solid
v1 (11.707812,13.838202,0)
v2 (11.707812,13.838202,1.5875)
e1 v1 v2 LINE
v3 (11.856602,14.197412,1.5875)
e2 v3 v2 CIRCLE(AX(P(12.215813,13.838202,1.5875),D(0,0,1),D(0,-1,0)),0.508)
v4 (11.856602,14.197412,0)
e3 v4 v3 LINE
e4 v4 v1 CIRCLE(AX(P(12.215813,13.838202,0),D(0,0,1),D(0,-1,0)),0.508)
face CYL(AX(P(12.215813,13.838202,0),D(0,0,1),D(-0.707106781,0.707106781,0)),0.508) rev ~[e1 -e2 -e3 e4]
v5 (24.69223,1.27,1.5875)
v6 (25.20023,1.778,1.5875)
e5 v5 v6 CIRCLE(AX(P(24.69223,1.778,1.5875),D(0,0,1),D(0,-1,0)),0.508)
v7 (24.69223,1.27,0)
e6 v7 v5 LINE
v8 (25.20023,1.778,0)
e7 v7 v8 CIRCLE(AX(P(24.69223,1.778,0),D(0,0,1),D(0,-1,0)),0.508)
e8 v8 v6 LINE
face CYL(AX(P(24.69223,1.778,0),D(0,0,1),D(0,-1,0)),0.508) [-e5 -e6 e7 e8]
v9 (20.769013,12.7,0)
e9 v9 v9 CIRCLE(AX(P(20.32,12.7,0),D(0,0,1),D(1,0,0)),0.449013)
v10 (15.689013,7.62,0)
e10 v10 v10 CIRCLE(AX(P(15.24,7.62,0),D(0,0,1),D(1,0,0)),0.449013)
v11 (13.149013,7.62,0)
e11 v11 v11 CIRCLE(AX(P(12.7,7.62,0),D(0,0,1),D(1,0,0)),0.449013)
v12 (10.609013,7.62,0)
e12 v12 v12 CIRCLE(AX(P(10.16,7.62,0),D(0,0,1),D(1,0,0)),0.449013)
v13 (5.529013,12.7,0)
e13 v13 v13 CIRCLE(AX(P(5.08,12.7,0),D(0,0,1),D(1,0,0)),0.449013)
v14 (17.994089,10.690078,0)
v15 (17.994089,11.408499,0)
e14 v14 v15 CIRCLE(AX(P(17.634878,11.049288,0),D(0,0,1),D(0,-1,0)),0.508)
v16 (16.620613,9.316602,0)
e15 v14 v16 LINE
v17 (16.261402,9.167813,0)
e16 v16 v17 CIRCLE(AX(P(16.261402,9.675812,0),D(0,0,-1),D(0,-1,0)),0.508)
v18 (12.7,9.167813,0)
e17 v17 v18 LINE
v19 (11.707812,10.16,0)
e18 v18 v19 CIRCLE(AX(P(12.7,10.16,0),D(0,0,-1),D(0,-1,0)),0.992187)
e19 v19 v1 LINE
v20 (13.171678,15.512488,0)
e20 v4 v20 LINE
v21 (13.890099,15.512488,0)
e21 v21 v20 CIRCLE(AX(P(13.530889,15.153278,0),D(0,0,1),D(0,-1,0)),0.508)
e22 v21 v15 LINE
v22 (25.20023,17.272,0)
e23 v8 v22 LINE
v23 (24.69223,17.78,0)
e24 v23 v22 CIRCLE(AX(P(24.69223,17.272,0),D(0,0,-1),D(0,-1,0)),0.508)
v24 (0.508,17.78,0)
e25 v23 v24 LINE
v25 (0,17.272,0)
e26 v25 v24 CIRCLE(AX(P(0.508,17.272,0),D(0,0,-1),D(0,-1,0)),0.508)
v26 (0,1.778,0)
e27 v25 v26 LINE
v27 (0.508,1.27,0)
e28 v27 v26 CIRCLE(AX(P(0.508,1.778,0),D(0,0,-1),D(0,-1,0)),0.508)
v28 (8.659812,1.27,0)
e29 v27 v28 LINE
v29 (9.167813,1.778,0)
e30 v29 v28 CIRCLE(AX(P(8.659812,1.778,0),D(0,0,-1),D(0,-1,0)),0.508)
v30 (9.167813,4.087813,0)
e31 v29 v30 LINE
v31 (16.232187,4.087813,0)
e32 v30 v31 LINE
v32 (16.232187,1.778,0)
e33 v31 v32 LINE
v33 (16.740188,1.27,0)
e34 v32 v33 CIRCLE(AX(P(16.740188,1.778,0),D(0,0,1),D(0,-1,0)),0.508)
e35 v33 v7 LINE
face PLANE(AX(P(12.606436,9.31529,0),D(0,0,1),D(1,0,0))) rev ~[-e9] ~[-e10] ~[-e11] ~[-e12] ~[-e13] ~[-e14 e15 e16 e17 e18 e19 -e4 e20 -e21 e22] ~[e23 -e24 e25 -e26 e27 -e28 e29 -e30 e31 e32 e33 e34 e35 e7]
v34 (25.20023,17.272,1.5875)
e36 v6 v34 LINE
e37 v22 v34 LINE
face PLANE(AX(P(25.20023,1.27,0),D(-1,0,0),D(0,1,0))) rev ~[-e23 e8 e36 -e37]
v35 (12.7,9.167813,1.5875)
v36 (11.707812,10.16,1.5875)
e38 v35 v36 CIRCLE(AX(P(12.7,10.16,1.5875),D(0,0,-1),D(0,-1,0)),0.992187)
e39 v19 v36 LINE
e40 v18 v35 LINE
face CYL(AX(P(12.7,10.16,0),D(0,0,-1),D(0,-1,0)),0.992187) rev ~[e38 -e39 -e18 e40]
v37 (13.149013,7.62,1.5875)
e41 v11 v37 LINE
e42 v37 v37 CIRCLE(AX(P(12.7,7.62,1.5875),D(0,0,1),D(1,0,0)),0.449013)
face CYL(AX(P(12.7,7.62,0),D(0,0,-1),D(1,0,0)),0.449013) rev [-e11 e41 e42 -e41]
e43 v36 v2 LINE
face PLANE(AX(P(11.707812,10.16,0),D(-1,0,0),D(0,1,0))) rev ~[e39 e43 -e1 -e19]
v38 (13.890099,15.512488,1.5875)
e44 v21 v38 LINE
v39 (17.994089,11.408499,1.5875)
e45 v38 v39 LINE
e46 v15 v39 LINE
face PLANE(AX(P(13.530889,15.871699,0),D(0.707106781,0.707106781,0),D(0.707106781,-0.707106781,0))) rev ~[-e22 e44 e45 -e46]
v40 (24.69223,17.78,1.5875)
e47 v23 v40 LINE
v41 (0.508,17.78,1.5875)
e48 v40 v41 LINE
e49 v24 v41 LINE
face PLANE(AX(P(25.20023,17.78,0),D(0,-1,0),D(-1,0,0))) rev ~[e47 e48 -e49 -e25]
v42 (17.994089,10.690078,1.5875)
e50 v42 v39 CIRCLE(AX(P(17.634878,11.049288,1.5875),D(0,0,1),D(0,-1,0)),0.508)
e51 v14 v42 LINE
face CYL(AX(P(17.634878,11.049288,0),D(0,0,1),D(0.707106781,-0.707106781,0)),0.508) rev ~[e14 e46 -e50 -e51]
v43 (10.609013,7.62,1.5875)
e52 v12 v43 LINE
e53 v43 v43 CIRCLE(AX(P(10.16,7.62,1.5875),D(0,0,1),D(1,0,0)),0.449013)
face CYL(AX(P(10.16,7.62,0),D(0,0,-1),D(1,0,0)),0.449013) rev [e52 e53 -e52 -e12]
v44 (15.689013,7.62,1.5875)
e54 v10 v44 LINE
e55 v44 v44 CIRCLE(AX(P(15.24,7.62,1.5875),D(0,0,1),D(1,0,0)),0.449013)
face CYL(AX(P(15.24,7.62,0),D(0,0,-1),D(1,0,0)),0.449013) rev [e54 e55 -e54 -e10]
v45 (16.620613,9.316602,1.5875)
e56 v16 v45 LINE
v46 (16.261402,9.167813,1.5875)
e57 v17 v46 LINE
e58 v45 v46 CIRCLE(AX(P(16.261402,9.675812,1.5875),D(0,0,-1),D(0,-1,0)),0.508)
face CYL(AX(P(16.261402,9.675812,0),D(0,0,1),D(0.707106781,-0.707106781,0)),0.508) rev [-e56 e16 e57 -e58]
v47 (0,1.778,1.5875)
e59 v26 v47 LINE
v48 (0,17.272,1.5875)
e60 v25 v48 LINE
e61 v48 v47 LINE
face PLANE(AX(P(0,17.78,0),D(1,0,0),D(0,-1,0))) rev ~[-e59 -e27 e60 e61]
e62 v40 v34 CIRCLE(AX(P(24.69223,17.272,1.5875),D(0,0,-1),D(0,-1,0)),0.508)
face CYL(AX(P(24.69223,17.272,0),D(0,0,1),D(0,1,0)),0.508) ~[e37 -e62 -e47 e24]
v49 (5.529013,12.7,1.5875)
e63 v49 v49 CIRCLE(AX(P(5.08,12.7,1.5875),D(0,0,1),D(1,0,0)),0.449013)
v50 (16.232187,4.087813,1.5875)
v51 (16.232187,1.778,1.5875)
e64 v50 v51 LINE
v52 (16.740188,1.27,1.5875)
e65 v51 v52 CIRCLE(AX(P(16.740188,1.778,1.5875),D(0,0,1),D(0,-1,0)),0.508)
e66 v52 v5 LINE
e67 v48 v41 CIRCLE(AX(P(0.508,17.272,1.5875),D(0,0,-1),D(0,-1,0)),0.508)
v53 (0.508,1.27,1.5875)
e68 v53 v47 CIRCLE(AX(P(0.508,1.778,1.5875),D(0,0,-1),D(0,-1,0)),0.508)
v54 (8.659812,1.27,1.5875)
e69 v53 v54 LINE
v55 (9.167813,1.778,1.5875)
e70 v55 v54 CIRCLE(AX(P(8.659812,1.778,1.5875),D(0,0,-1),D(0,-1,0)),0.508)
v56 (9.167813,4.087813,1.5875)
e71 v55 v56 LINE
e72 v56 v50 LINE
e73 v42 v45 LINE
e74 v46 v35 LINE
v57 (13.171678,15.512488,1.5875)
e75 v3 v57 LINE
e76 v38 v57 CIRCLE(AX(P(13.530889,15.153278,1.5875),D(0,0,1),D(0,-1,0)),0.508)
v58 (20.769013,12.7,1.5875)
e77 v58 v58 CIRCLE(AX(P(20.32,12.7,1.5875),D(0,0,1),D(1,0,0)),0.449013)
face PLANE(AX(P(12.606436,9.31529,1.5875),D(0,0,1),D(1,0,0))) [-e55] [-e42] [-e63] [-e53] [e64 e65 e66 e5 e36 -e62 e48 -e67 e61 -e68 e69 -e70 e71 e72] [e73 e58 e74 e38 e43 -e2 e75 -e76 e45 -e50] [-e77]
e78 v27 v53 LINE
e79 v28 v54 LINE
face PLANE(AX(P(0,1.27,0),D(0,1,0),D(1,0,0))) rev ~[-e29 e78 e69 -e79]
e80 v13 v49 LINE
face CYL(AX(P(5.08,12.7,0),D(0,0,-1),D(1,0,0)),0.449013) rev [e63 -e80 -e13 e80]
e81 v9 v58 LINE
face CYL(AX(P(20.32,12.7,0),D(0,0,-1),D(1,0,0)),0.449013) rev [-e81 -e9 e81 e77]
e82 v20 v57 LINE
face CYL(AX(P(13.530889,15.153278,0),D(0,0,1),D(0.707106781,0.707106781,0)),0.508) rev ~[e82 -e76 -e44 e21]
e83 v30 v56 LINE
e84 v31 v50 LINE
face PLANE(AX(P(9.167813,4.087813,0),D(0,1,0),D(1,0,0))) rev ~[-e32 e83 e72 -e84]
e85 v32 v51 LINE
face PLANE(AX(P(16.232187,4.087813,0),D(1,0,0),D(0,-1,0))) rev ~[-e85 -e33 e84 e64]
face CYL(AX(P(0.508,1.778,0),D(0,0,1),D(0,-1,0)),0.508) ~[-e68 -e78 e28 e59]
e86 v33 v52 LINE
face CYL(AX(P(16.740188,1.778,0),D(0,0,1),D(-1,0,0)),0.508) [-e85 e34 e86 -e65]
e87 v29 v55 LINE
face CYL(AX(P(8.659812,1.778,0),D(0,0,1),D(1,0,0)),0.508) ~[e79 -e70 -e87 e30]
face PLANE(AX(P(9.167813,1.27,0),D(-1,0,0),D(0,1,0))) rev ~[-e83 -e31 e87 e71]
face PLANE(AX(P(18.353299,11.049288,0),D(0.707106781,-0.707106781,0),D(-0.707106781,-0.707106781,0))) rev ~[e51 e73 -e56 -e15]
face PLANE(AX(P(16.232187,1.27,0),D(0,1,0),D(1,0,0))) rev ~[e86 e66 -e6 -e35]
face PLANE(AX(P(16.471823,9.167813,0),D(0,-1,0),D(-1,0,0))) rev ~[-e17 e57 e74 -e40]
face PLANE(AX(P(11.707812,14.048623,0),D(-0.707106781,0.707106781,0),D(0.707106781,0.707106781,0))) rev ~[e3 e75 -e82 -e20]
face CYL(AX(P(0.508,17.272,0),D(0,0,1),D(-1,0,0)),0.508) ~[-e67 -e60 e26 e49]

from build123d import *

# Parameters (mm, degrees)
F2_R     = 0.4490128061
F3_DEPTH = 1.5875
F4_R     = 0.508


# Not quite as in the source:
# - a length typed as a fraction of an inch, garbled in the dataset ("3 / 203.2 mm" for 3/8 in), is restored


with BuildPart() as f3:
    # F2 (on Top) → F3 (new body)
    with BuildSketch(Plane.XY):
        Polygon((9.1678125, 1.27), (9.1678125, 4.0878125), (16.2321875, 4.0878125), (16.2321875, 1.27), (25.2002304245, 1.27), (25.2002304245, 17.78), (0, 17.78), (0, 1.27), align=None)
        with Locations((10.16, 7.62)):
            Circle(F2_R, mode=Mode.SUBTRACT)
        with Locations((12.7, 7.62)):
            Circle(F2_R, mode=Mode.SUBTRACT)
        with Locations((15.24, 7.62)):
            Circle(F2_R, mode=Mode.SUBTRACT)
        with Locations((5.08, 12.7)):
            Circle(F2_R, mode=Mode.SUBTRACT)
        with BuildLine():
            Line((16.4718229778, 9.1678125), (12.7, 9.1678125))
            ThreePointArc((12.7, 9.1678125), (11.9984174905, 9.4584174905), (11.7078125, 10.16))
            Line((11.7078125, 10.16), (11.7078125, 14.0486225217))
            Line((11.7078125, 14.0486225217), (13.5308885435, 15.8716985652))
            Line((13.5308885435, 15.8716985652), (18.3532987932, 11.0492883154))
            Line((18.3532987932, 11.0492883154), (16.4718229778, 9.1678125))
        make_face(mode=Mode.SUBTRACT)
        with Locations((20.32, 12.7)):
            Circle(F2_R, mode=Mode.SUBTRACT)
    extrude(amount=F3_DEPTH)

    # F4
    f4_edges = [f3.edges().sort_by_distance(p)[0] for p in [
        (25.20023, 1.27, 0.79375),
        (16.232188, 1.27, 0.79375),
        (9.167813, 1.27, 0.79375),
        (0, 1.27, 0.79375),
        (0, 17.78, 0.79375),
        (25.20023, 17.78, 0.79375),
        (11.707813, 14.048623, 0.79375),
        (13.530889, 15.871699, 0.79375),
        (18.353299, 11.049288, 0.79375),
        (16.471823, 9.167813, 0.79375),
    ]]
    fillet(f4_edges, radius=F4_R)


solid = f3.part
